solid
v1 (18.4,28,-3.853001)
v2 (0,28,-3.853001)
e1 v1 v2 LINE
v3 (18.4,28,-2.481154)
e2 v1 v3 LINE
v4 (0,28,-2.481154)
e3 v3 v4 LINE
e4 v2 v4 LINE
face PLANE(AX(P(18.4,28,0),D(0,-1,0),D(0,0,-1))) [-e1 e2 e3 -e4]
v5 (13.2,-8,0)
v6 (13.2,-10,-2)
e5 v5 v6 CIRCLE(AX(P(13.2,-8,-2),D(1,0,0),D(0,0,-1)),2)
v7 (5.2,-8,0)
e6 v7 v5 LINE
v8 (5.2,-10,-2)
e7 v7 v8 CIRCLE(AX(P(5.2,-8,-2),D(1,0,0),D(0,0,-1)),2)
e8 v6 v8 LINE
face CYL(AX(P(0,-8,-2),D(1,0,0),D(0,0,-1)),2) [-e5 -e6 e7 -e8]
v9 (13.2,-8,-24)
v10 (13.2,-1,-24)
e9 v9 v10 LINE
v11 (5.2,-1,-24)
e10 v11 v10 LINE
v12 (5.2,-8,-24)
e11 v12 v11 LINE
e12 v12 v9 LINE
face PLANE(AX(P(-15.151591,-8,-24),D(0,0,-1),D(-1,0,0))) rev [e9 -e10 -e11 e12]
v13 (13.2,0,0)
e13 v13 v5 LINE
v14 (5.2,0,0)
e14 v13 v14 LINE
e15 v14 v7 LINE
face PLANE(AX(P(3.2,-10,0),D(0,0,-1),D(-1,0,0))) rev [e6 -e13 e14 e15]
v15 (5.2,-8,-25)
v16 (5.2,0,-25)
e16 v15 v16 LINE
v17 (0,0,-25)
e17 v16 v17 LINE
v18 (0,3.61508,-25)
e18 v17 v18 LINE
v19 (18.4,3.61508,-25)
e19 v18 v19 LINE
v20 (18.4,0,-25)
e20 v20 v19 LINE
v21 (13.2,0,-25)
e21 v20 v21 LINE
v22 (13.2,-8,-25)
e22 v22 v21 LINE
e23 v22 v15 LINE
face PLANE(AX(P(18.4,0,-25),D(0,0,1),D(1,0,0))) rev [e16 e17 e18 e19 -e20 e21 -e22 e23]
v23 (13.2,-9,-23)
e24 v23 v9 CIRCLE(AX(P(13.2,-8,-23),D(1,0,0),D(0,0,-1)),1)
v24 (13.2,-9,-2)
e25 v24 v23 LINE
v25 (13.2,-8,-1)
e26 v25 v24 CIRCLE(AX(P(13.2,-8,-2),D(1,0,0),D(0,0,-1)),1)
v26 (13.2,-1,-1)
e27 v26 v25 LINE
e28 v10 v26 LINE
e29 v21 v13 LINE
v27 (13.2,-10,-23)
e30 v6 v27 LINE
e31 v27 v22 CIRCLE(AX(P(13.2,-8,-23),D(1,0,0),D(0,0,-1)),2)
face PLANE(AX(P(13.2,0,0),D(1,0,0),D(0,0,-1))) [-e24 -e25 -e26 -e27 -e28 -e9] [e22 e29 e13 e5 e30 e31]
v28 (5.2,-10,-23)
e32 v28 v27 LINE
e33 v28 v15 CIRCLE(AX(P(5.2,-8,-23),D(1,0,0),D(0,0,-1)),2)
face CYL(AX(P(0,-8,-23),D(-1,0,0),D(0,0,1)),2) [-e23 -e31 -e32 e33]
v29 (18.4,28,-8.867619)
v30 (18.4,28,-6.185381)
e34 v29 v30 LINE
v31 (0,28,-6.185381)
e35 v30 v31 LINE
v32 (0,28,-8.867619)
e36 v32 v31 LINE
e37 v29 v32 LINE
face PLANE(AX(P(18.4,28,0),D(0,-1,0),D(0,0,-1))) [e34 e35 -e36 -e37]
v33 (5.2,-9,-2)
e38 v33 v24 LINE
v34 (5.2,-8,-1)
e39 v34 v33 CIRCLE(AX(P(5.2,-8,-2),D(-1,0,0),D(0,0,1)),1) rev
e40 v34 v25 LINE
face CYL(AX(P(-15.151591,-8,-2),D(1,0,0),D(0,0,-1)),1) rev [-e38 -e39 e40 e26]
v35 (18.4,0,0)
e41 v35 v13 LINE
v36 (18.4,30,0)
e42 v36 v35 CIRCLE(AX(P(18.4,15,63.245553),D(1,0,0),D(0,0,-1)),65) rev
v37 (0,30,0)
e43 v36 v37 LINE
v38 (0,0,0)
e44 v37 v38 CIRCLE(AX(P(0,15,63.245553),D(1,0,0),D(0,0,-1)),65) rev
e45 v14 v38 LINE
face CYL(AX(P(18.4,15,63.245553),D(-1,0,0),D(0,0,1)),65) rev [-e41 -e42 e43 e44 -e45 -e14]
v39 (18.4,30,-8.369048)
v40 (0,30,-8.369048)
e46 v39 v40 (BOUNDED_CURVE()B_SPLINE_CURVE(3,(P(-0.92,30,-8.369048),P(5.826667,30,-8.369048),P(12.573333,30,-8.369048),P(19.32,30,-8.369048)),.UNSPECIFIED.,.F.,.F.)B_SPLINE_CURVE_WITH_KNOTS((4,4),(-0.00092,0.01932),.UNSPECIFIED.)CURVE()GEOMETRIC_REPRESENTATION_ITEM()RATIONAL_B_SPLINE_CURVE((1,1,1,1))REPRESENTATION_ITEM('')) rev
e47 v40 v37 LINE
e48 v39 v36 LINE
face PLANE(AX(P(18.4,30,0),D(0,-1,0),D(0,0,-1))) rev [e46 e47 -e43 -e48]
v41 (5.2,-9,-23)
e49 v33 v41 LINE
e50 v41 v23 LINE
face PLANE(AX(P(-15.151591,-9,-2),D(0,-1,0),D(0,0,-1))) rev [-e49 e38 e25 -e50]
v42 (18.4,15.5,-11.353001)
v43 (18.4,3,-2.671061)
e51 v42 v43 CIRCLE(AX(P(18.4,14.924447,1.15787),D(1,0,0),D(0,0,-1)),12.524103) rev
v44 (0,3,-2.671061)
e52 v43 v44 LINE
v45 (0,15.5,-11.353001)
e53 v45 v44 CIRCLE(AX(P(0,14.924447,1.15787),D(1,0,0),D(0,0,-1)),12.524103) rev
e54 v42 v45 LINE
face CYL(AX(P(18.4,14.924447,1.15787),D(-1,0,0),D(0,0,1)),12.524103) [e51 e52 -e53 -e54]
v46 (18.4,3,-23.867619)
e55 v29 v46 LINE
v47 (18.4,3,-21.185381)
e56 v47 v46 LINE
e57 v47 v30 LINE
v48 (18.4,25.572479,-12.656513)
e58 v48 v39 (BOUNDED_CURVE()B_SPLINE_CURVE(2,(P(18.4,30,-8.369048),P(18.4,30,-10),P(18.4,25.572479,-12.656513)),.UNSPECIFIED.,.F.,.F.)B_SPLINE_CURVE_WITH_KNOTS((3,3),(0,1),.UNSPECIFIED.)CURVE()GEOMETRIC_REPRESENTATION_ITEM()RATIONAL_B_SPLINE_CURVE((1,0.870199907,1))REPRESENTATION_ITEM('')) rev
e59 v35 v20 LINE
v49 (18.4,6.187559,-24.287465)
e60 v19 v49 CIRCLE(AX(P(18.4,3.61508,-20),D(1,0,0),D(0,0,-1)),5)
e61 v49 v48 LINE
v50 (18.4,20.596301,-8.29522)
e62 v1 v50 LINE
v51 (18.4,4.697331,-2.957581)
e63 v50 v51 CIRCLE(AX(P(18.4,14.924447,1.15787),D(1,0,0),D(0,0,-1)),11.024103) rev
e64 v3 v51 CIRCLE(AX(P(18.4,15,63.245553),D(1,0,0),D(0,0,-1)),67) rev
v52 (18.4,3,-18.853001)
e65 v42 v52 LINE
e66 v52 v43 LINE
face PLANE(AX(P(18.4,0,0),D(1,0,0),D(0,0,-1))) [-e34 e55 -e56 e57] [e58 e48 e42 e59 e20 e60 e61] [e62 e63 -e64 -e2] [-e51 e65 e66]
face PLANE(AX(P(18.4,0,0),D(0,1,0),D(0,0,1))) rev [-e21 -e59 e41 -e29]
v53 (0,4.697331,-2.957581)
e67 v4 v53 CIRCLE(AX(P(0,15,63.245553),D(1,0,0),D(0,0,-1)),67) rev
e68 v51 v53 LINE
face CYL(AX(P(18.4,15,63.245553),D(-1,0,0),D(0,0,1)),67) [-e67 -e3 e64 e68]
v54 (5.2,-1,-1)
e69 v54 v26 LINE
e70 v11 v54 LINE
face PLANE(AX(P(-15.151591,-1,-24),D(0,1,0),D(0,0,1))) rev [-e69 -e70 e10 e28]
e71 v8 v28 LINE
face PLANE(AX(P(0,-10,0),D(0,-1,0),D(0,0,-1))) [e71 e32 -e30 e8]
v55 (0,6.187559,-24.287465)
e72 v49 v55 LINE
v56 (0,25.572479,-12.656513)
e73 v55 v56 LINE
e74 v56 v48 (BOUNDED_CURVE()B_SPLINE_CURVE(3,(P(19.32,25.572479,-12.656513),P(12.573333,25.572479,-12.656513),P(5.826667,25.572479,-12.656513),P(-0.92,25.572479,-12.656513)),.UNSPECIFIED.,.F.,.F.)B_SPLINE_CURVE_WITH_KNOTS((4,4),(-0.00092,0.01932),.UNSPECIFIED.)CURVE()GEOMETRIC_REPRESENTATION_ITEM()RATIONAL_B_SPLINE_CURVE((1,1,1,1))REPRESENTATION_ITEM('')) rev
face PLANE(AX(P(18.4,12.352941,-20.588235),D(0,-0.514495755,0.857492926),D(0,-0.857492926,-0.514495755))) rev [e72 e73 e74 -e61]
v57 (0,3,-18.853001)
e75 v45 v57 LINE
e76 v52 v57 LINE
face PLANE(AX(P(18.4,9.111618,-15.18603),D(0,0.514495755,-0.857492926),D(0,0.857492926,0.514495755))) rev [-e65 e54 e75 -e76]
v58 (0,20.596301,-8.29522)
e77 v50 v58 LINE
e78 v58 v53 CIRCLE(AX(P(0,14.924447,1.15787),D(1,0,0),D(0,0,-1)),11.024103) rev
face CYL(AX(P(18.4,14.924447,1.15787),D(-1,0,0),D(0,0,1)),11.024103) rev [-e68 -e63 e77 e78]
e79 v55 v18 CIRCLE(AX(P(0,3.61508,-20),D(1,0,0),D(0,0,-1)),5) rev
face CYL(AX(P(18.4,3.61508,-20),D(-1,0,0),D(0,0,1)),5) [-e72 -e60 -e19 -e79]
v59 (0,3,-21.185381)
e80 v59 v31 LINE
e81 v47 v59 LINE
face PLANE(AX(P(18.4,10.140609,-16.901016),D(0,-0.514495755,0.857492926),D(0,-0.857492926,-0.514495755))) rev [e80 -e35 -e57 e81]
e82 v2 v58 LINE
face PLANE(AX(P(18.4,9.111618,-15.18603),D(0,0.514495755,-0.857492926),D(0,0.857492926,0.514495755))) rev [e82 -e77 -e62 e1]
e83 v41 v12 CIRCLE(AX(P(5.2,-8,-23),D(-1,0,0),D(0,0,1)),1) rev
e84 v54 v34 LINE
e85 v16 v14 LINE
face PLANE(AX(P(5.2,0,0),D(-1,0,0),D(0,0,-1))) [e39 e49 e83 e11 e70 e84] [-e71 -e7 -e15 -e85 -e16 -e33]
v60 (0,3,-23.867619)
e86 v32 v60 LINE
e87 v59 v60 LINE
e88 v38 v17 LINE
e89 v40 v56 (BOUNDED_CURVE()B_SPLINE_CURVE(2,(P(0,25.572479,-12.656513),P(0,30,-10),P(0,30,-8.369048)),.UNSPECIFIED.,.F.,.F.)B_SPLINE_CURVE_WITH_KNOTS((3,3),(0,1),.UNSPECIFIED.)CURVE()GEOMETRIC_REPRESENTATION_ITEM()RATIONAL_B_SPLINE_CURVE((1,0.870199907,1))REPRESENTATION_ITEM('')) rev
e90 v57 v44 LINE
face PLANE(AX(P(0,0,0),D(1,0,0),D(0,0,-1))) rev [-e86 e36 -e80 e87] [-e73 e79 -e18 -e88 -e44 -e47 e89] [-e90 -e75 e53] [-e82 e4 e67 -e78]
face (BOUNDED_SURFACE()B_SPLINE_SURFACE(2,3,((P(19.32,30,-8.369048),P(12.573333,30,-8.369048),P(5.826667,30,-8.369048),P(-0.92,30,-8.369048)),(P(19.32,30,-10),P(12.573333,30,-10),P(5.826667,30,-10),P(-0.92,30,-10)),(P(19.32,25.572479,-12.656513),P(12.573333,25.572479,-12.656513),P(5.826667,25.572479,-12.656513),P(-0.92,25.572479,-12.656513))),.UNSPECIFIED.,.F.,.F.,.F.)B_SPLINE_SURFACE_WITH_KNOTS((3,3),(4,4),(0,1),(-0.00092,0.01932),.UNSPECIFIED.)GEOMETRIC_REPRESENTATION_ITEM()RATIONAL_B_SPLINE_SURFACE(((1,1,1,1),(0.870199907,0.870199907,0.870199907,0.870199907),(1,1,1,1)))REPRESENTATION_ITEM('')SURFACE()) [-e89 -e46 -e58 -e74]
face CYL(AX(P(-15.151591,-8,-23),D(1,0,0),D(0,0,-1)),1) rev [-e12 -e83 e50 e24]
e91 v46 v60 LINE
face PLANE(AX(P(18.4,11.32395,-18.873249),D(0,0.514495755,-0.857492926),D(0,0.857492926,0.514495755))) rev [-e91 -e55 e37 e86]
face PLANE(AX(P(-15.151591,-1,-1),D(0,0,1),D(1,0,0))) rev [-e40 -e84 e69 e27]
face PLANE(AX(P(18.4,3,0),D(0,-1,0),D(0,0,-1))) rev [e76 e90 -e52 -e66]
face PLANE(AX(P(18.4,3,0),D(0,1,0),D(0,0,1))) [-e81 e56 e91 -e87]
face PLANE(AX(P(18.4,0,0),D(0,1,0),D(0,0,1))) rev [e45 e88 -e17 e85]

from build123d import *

# Parameters (mm, degrees)
BOSS_EXTRUDE1_DEPTH = 18.4
FILLET2_R           = 5
SKETCH2_W           = 12
SKETCH2_H           = 25
BOSS_EXTRUDE2_DEPTH = 10
SKETCH3_R           = 2.2
CUT_EXTRUDE1_DEPTH  = 42.905131118
FILLET3_R           = 2
SKETCH4_R           = 2.2
CUT_EXTRUDE2_DEPTH  = 2
CUT_EXTRUDE3_START  = -6
CUT_EXTRUDE3_DEPTH  = 4


with BuildPart() as part:
    # Sketch1 → Boss-Extrude1 (new body)
    # profile 1 of 2: a face of its own
    with BuildSketch(Plane(origin=(0, 0, 0), x_dir=(0, 0, -1), z_dir=(1, 0, 0))):
        with BuildLine():
            Line((10, 30), (0, 30))
            ThreePointArc((0, 30), (1.754446797, 15), (0, 0))
            Line((0, 0), (25, 0))
            Line((25, 0), (25, 5))
            Line((25, 5), (10, 30))
        make_face()
        with BuildLine():
            ThreePointArc((2.481153697, 28), (3.752513812, 15.508936318), (2.671060787, 3))
            Line((2.671060787, 3), (18.853000612, 3))
            Line((18.853000612, 3), (3.853000612, 28))
            Line((3.853000612, 28), (2.481153697, 28))
        make_face(mode=Mode.SUBTRACT)
        Polygon((21.18538137, 3), (23.867619242, 3), (8.867619242, 28), (6.18538137, 28), align=None, mode=Mode.SUBTRACT)
    # profile 2 of 2: a face of its own
    with BuildSketch(Plane(origin=(0, 0, 0), x_dir=(0, 0, -1), z_dir=(1, 0, 0))):
        with BuildLine():
            Line((11.353000612, 15.5), (8.295219913, 20.596301166))
            ThreePointArc((8.295219913, 20.596301166), (9.29299781, 11.415857711), (2.957581264, 4.69733109))
            ThreePointArc((2.957581264, 4.69733109), (2.819772168, 3.847745357), (2.671060787, 3))
            ThreePointArc((2.671060787, 3), (9.128517918, 7.779982826), (11.353000612, 15.5))
        make_face()
    extrude(amount=BOSS_EXTRUDE1_DEPTH)

    # Fillet1
    # an asymmetric fillet: 7, 5 mm, written as the material it takes off along each edge
    with BuildSketch(Plane(origin=(-12.908331632, 30, -10), x_dir=(0, 0, 1), z_dir=(1, 0, 0))) as fillet1_piece_1:
        with BuildLine():
            Bezier((1.630951895, 0), (0, 0), (-2.656512734, 4.427521223), weights=[1, 0.870199907, 1])
            Line((-2.656512734, 4.427521223), (0, 0))
            Line((0, 0), (1.630951895, 0))
        make_face()
    extrude(amount=44.216663264, mode=Mode.SUBTRACT)

    # Fillet2
    fillet2_edges = [part.edges().sort_by_distance(p)[0] for p in [
        (9.2, 5, -25),
    ]]
    fillet(fillet2_edges, radius=FILLET2_R)

    # Sketch2 → Boss-Extrude2 (add)
    with BuildSketch(Plane(origin=(0, 0, 0), x_dir=(-1, 0, 0), z_dir=(0, -1, 0))):
        with Locations((-9.2, 12.5)):
            Rectangle(SKETCH2_W, SKETCH2_H)
    extrude(amount=BOSS_EXTRUDE2_DEPTH)

    # Sketch3 → Cut-Extrude1 (cut, through all)
    with BuildSketch(Plane(origin=(15.2, 0, 0), x_dir=(0, 0, -1), z_dir=(1, 0, 0))):
        with Locations((5, -6)):
            Circle(SKETCH3_R)
        with Locations((20, -6)):
            Circle(SKETCH3_R)
    extrude(amount=-CUT_EXTRUDE1_DEPTH, mode=Mode.SUBTRACT)

    # Fillet3
    fillet3_edges = [part.edges().sort_by_distance(p)[0] for p in [
        (9.2, -10, -25),
        (9.2, -10, 0),
    ]]
    fillet(fillet3_edges, radius=FILLET3_R)

    # Sketch4 → Cut-Extrude2 (cut)
    # profile 1 of 2: a face of its own
    with BuildSketch(Plane(origin=(15.2, 0, 0), x_dir=(0, 0, -1), z_dir=(1, 0, 0))):
        with BuildLine():
            Line((25, 0), (0, 0))
            Line((0, 0), (0, -8))
            ThreePointArc((0, -8), (0.585786438, -9.414213562), (2, -10))
            Line((2, -10), (23, -10))
            ThreePointArc((23, -10), (24.414213562, -9.414213562), (25, -8))
            Line((25, -8), (25, 0))
        make_face()
        with BuildLine():
            ThreePointArc((23, -9), (23.707106781, -8.707106781), (24, -8))
            Line((24, -8), (24, -1))
            Line((24, -1), (1, -1))
            Line((1, -1), (1, -8))
            ThreePointArc((1, -8), (1.292893219, -8.707106781), (2, -9))
            Line((2, -9), (23, -9))
        make_face(mode=Mode.SUBTRACT)
    # profile 2 of 2: a face of its own
    with BuildSketch(Plane(origin=(15.2, 0, 0), x_dir=(0, 0, -1), z_dir=(1, 0, 0))):
        with BuildLine():
            Line((2, -9), (23, -9))
            ThreePointArc((23, -9), (23.707106781, -8.707106781), (24, -8))
            Line((24, -8), (24, -1))
            Line((24, -1), (1, -1))
            Line((1, -1), (1, -8))
            ThreePointArc((1, -8), (1.292893219, -8.707106781), (2, -9))
        make_face()
        with Locations((5, -6)):
            Circle(SKETCH4_R, mode=Mode.SUBTRACT)
        with Locations((20, -6)):
            Circle(SKETCH4_R, mode=Mode.SUBTRACT)
    cut_extrude2 = extrude(amount=-CUT_EXTRUDE2_DEPTH, mode=Mode.SUBTRACT)

    # Sketch4<3> → Cut-Extrude3 (cut)
    with BuildSketch(Plane(origin=(15.2, 0, 0), x_dir=(0, 0, -1), z_dir=(1, 0, 0)).offset(CUT_EXTRUDE3_START)):
        with BuildLine():
            Line((1, -1), (1, -8))
            ThreePointArc((1, -8), (1.292893219, -8.707106781), (2, -9))
            Line((2, -9), (23, -9))
            ThreePointArc((23, -9), (23.707106781, -8.707106781), (24, -8))
            Line((24, -8), (24, -1))
            Line((24, -1), (1, -1))
        make_face()
    cut_extrude3 = extrude(amount=CUT_EXTRUDE3_DEPTH, mode=Mode.SUBTRACT)

    # Mirror1: Cut-Extrude2, Cut-Extrude3 across plane
    add(cut_extrude2.mirror(Plane(origin=(9.2, 0, 0), x_dir=(0, 0, 1), z_dir=(1, 0, 0))), mode=Mode.SUBTRACT)
    add(cut_extrude3.mirror(Plane(origin=(9.2, 0, 0), x_dir=(0, 0, 1), z_dir=(1, 0, 0))), mode=Mode.SUBTRACT)


solid = part.part
